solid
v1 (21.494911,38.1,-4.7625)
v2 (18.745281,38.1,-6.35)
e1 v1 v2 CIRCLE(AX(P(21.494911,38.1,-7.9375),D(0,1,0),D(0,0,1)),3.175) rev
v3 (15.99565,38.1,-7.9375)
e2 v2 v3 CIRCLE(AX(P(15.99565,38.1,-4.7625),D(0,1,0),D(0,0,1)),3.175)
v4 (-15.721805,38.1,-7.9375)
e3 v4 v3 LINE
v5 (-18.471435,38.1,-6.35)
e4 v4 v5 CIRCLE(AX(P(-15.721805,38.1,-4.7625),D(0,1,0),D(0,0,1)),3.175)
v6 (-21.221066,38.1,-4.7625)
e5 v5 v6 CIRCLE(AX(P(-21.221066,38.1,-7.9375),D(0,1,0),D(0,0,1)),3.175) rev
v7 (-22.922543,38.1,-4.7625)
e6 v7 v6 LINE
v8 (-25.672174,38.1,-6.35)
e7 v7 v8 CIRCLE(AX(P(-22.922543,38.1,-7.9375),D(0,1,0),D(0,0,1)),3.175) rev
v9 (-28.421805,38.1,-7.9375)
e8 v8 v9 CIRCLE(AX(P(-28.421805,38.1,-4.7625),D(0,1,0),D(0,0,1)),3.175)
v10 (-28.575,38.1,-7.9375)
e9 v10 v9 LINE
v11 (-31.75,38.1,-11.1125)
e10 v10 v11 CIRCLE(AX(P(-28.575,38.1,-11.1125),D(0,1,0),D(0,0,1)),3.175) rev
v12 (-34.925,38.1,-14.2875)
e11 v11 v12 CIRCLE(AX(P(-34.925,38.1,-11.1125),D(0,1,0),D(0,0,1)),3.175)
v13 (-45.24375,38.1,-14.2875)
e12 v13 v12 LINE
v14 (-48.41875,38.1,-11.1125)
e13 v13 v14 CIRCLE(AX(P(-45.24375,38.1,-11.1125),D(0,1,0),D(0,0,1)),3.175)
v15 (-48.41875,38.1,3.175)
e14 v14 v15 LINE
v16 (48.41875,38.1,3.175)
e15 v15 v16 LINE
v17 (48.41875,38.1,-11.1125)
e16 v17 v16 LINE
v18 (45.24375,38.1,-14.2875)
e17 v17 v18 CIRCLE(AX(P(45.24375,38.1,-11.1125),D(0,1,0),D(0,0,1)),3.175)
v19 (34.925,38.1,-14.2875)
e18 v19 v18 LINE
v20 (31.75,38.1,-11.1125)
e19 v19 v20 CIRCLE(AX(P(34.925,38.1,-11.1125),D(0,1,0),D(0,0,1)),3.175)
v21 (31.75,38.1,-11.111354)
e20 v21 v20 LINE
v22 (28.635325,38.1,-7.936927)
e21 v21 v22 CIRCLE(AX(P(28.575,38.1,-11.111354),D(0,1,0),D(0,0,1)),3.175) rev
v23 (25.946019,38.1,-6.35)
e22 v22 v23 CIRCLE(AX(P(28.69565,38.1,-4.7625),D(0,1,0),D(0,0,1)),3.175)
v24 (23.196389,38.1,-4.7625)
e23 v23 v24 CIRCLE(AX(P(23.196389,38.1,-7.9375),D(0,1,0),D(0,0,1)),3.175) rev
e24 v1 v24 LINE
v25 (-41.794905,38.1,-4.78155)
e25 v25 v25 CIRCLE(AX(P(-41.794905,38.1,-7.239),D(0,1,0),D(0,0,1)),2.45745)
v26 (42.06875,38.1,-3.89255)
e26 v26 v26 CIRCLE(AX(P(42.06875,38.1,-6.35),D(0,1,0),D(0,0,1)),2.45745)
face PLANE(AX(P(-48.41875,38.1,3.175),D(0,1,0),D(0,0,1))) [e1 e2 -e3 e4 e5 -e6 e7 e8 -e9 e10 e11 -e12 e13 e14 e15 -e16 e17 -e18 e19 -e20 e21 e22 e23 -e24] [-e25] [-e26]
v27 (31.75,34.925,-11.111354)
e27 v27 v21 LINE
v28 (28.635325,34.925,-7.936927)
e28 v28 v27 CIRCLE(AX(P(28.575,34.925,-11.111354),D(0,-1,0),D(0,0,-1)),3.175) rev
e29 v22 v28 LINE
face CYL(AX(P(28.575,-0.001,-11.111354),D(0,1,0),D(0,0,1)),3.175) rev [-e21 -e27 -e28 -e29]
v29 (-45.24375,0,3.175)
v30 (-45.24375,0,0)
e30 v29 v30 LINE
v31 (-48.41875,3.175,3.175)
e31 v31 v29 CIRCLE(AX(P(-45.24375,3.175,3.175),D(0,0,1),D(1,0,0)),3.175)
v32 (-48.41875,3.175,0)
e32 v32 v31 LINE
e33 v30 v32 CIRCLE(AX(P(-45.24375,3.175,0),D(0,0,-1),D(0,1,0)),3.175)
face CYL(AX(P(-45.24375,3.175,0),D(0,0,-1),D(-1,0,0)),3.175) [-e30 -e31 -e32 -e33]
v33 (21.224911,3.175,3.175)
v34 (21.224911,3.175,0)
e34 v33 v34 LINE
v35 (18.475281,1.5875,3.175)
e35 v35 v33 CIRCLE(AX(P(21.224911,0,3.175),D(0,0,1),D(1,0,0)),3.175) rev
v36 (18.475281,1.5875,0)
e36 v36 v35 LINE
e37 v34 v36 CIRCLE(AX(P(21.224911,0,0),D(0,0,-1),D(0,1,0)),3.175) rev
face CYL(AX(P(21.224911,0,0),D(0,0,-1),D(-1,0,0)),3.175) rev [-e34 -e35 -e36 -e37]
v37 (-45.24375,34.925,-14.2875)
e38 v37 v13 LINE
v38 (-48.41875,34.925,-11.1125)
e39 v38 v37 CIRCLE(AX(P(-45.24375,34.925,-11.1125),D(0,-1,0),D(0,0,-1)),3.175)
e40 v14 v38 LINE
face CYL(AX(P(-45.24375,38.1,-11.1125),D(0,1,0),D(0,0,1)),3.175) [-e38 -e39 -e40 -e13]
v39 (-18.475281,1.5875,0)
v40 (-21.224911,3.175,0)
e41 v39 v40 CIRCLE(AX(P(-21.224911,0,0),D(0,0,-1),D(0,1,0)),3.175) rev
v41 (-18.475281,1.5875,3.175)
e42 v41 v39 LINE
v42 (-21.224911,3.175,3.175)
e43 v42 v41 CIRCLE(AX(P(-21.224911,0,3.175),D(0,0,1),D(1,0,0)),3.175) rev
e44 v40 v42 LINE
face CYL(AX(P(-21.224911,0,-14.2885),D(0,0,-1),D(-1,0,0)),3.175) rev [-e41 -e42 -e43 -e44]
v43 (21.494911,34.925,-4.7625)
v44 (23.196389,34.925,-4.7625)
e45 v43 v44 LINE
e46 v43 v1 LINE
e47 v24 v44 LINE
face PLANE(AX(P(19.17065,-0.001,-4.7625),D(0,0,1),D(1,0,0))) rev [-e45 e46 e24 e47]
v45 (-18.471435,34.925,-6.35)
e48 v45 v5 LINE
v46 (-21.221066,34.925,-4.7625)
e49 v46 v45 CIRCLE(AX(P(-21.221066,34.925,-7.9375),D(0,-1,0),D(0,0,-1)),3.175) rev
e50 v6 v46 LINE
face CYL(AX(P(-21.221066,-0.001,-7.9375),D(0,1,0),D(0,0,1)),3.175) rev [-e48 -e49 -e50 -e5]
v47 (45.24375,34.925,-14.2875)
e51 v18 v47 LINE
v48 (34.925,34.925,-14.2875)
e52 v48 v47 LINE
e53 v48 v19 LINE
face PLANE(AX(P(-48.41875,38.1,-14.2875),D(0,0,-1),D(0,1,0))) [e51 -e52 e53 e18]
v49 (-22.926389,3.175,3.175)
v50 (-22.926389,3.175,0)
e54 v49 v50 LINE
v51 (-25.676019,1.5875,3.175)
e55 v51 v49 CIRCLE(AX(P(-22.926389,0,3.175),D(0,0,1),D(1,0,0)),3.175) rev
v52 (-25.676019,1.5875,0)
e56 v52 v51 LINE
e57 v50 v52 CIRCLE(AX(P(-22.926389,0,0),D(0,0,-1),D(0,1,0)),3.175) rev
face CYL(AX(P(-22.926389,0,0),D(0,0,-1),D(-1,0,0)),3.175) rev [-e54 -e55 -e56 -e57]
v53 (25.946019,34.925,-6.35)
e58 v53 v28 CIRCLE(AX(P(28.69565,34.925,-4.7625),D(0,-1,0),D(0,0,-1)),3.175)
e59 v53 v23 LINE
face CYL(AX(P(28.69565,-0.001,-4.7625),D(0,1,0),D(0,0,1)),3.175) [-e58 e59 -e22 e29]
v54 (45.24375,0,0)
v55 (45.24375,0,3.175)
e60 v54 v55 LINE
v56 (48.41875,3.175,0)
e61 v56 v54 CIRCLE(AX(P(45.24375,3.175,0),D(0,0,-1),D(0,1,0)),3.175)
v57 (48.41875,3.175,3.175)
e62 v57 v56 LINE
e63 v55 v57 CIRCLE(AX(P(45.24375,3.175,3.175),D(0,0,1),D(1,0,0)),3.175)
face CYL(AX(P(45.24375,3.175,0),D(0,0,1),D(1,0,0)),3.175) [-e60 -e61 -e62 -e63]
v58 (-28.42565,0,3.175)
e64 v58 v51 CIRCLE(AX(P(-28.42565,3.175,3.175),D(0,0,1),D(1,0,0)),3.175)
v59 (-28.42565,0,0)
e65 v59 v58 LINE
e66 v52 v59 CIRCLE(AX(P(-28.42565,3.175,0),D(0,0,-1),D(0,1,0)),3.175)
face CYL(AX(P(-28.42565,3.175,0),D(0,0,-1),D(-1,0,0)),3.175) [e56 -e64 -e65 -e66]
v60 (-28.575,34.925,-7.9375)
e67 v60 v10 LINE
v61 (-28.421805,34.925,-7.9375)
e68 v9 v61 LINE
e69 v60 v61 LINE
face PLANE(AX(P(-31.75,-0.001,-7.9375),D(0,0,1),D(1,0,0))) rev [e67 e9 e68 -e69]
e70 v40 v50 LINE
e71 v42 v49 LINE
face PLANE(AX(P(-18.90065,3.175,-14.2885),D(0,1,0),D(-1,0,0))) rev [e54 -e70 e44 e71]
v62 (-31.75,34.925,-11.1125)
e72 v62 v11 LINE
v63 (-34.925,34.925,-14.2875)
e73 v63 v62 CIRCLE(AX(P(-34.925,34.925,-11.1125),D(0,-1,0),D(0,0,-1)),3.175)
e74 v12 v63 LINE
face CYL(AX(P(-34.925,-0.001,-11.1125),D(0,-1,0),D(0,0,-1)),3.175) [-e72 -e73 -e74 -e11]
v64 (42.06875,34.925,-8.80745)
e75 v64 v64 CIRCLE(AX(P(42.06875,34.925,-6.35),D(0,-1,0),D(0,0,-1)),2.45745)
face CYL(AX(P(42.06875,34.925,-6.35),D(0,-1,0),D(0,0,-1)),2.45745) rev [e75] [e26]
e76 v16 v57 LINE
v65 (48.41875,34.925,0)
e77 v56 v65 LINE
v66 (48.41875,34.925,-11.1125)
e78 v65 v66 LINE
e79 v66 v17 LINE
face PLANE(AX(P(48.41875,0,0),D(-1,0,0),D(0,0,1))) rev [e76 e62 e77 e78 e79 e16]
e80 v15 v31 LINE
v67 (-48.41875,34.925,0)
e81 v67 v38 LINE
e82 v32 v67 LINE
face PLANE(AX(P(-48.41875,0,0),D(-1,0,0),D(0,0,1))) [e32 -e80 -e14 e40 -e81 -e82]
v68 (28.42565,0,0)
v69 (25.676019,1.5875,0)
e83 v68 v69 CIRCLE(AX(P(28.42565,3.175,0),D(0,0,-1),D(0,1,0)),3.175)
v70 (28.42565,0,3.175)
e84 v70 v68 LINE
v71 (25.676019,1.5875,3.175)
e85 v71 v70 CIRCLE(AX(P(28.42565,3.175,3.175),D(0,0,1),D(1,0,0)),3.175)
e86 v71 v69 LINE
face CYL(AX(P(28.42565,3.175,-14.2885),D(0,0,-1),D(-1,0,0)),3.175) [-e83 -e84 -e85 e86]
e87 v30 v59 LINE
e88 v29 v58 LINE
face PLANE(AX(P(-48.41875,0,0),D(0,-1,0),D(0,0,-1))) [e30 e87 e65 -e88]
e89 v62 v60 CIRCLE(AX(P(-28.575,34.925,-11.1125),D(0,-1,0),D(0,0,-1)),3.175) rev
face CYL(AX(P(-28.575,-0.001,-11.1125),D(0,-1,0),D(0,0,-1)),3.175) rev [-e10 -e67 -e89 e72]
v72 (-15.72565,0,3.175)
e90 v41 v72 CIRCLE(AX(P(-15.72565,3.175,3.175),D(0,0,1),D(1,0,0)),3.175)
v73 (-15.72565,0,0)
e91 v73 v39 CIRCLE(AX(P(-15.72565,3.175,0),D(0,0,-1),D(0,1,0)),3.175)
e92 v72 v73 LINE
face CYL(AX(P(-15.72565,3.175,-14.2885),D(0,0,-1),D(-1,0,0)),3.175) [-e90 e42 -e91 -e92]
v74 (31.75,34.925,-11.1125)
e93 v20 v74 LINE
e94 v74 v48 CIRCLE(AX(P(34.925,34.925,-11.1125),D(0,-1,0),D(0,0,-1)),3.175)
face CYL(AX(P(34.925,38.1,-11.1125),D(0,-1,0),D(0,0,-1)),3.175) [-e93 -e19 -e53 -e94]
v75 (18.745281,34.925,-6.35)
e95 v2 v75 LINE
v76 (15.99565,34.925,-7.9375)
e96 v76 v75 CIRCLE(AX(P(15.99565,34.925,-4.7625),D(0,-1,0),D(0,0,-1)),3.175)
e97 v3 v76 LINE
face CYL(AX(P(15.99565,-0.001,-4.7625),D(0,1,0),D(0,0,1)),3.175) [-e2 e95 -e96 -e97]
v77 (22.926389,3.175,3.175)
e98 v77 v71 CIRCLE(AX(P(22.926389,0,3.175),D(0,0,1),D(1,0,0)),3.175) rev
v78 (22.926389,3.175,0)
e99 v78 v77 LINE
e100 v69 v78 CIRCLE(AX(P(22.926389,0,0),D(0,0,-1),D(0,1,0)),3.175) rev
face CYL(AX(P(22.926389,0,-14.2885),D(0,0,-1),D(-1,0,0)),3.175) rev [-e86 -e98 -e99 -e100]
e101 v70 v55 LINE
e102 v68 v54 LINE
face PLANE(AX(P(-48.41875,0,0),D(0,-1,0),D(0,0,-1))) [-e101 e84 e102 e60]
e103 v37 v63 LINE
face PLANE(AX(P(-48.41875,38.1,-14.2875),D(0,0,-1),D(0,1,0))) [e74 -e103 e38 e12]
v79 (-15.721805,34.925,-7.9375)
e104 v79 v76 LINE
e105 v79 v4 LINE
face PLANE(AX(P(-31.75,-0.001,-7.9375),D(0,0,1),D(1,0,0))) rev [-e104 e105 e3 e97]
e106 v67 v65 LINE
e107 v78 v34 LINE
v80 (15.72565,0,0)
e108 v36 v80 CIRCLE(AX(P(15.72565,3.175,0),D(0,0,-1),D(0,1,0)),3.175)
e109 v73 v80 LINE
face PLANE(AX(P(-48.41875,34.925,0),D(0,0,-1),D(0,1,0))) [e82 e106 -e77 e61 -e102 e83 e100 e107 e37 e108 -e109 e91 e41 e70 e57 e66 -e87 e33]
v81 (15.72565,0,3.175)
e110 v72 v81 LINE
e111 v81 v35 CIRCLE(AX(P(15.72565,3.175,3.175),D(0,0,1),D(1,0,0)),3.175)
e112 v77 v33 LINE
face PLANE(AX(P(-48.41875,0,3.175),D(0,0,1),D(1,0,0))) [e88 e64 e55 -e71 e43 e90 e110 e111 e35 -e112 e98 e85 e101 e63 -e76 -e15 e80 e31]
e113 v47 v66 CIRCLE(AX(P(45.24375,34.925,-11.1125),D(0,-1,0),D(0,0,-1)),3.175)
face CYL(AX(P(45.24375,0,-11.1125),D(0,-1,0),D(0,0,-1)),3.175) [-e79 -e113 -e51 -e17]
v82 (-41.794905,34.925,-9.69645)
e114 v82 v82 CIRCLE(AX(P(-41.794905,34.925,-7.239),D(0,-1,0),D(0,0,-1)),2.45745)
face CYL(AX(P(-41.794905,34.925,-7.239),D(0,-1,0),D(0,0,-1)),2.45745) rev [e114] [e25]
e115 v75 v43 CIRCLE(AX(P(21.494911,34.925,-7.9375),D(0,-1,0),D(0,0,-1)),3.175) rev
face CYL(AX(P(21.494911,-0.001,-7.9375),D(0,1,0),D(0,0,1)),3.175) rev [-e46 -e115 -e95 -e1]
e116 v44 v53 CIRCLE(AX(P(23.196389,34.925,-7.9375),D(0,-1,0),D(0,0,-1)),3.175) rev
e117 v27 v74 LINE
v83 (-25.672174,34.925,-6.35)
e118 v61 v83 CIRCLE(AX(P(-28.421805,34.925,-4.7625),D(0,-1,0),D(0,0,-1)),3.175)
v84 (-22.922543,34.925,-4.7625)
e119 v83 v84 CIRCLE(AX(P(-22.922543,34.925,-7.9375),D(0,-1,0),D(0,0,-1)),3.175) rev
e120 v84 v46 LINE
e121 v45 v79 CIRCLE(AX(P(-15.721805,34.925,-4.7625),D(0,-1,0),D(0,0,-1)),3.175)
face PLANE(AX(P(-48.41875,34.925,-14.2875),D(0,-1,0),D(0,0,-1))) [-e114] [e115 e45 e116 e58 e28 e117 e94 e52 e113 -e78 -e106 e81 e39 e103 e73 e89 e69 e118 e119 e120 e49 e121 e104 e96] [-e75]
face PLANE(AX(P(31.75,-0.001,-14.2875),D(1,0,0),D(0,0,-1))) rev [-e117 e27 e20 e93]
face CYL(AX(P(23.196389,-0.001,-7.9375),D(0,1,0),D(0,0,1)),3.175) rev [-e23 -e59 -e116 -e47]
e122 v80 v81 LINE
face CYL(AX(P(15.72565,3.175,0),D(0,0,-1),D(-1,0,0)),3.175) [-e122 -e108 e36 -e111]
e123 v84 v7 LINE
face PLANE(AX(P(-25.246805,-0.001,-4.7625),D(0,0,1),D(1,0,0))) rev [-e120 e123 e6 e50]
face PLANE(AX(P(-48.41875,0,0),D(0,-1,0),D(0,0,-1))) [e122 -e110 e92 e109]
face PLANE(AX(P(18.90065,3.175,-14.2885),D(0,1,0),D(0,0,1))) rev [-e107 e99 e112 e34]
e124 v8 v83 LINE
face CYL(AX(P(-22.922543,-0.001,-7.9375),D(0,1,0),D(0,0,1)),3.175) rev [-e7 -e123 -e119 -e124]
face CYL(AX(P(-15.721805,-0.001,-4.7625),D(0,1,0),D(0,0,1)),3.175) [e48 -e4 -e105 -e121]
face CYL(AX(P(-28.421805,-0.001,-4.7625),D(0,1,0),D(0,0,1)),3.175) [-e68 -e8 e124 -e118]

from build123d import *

# Parameters (mm, degrees)
BOSS_EXTRUDE1_DEPTH          = 48.41875
F_10_0_1935_DIAMETER_HOLE1_D = 4.9149
CUT_EXTRUDE3_REACH           = 65.246
SKETCH9_W                    = 63.5
SKETCH9_H                    = 6.35
CUT_EXTRUDE1_REACH           = 66.038
SKETCH7_W                    = 6.35
SKETCH7_H                    = 3.175
CUT_EXTRUDE2_REACH           = 65.246
SKETCH8_W                    = 6.35
SKETCH8_H                    = 3.175
FILLET1_R                    = 3.175
FILLET2_R                    = 3.175


with BuildPart() as part:
    # Sketch1 → Boss-Extrude1 (new, symmetric)
    with BuildSketch(Plane(origin=(0, 0, 0), x_dir=(0, 0, -1), z_dir=(1, 0, 0))):
        Polygon((0, 0), (-3.175, 0), (-3.175, 38.1), (14.2875, 38.1), (14.2875, 34.925), (0, 34.925), align=None)
    extrude(amount=BOSS_EXTRUDE1_DEPTH, both=True)

    # #10 (0.1935) Diameter Hole1 (through all)
    with Locations(Plane(origin=(0, 34.925, 0), x_dir=(-1, 0, 0), z_dir=(0, -1, 0))):
        with Locations((41.794904569, 7.239), (-42.06875, 6.35)):
            Hole(F_10_0_1935_DIAMETER_HOLE1_D / 2)

    # Sketch9 → Cut-Extrude3 (cut, up to next)
    with BuildSketch(Plane(origin=(0, 38.1, 0), x_dir=(1, 0, 0), z_dir=(0, 1, 0)), mode=Mode.PRIVATE) as cut_extrude3_sk1:
        with Locations((0, 11.1125)):
            Rectangle(SKETCH9_W, SKETCH9_H)
    cut_extrude3_tool1 = extrude(cut_extrude3_sk1.sketch, amount=-CUT_EXTRUDE3_REACH, mode=Mode.PRIVATE) & part.part
    add(cut_extrude3_tool1.solids().sort_by_distance((0, 38.1, -11.1125))[0], mode=Mode.SUBTRACT)

    # Sketch7 → Cut-Extrude1 (cut, up to next)
    with BuildSketch(Plane.XY.offset(3.175), mode=Mode.PRIVATE) as cut_extrude1_sk1:
        with Locations((-22.075650032, 1.5875)):
            Rectangle(SKETCH7_W, SKETCH7_H)
    cut_extrude1_tool1 = extrude(cut_extrude1_sk1.sketch, amount=-CUT_EXTRUDE1_REACH, mode=Mode.PRIVATE) & part.part
    # Sketch7 → Cut-Extrude1 (cut, up to next)
    with BuildSketch(Plane.XY.offset(3.175), mode=Mode.PRIVATE) as cut_extrude1_sk2:
        with Locations((22.075650032, 1.5875)):
            Rectangle(SKETCH7_W, SKETCH7_H)
    cut_extrude1_tool2 = extrude(cut_extrude1_sk2.sketch, amount=-CUT_EXTRUDE1_REACH, mode=Mode.PRIVATE) & part.part
    add(cut_extrude1_tool1.solids().sort_by_distance((-22.07565, 1.5875, 3.175))[0], mode=Mode.SUBTRACT)
    add(cut_extrude1_tool2.solids().sort_by_distance((22.07565, 1.5875, 3.175))[0], mode=Mode.SUBTRACT)

    # Sketch8 → Cut-Extrude2 (cut, up to next)
    with BuildSketch(Plane(origin=(0, 38.1, 0), x_dir=(1, 0, 0), z_dir=(0, 1, 0)), mode=Mode.PRIVATE) as cut_extrude2_sk1:
        with Locations((-22.071804601, 6.35)):
            Rectangle(SKETCH8_W, SKETCH8_H)
    cut_extrude2_tool1 = extrude(cut_extrude2_sk1.sketch, amount=-CUT_EXTRUDE2_REACH, mode=Mode.PRIVATE) & part.part
    # Sketch8 → Cut-Extrude2 (cut, up to next)
    with BuildSketch(Plane(origin=(0, 38.1, 0), x_dir=(1, 0, 0), z_dir=(0, 1, 0)), mode=Mode.PRIVATE) as cut_extrude2_sk2:
        with Locations((22.345650032, 6.35)):
            Rectangle(SKETCH8_W, SKETCH8_H)
    cut_extrude2_tool2 = extrude(cut_extrude2_sk2.sketch, amount=-CUT_EXTRUDE2_REACH, mode=Mode.PRIVATE) & part.part
    add(cut_extrude2_tool1.solids().sort_by_distance((-22.071805, 38.1, -6.35))[0], mode=Mode.SUBTRACT)
    add(cut_extrude2_tool2.solids().sort_by_distance((22.34565, 38.1, -6.35))[0], mode=Mode.SUBTRACT)

    # Fillet1
    fillet1_edges = [part.edges().sort_by_distance(p)[0] for p in [
        (25.250650032, 0, 1.5875),
        (18.900650032, 0, 1.5875),
        (-18.900650032, 0, 1.5875),
        (-25.250650032, 0, 1.5875),
        (48.41875, 36.5125, -14.2875),
        (-48.41875, 36.5125, -14.2875),
        (48.41875, 0, 1.5875),
        (-48.41875, 0, 1.5875),
        (25.520650032, 36.5125, -7.9375),
        (19.170650032, 36.5125, -7.9375),
        (-18.896804601, 36.5125, -7.9375),
        (-25.246804601, 36.5125, -7.9375),
        (31.75, 36.5125, -14.2875),
        (-31.75, 36.5125, -14.2875),
    ]]
    fillet(fillet1_edges, radius=FILLET1_R - 0.0001)  # a hair under: the kernel refuses the full size

    # Fillet2
    fillet2_edges = [part.edges().sort_by_distance(p)[0] for p in [
        (25.250650032, 3.175, 1.5875),
        (18.900650032, 3.175, 1.5875),
        (-18.900650032, 3.175, 1.5875),
        (-25.250650032, 3.175, 1.5875),
        (25.520650032, 36.5125, -4.7625),
        (19.170650032, 36.5125, -4.7625),
        (-18.896804601, 36.5125, -4.7625),
        (-25.246804601, 36.5125, -4.7625),
        (-31.75, 36.5125, -7.9375),
        (31.75, 36.5125, -7.9375),
    ]]
    fillet(fillet2_edges, radius=FILLET2_R)


solid = part.part
